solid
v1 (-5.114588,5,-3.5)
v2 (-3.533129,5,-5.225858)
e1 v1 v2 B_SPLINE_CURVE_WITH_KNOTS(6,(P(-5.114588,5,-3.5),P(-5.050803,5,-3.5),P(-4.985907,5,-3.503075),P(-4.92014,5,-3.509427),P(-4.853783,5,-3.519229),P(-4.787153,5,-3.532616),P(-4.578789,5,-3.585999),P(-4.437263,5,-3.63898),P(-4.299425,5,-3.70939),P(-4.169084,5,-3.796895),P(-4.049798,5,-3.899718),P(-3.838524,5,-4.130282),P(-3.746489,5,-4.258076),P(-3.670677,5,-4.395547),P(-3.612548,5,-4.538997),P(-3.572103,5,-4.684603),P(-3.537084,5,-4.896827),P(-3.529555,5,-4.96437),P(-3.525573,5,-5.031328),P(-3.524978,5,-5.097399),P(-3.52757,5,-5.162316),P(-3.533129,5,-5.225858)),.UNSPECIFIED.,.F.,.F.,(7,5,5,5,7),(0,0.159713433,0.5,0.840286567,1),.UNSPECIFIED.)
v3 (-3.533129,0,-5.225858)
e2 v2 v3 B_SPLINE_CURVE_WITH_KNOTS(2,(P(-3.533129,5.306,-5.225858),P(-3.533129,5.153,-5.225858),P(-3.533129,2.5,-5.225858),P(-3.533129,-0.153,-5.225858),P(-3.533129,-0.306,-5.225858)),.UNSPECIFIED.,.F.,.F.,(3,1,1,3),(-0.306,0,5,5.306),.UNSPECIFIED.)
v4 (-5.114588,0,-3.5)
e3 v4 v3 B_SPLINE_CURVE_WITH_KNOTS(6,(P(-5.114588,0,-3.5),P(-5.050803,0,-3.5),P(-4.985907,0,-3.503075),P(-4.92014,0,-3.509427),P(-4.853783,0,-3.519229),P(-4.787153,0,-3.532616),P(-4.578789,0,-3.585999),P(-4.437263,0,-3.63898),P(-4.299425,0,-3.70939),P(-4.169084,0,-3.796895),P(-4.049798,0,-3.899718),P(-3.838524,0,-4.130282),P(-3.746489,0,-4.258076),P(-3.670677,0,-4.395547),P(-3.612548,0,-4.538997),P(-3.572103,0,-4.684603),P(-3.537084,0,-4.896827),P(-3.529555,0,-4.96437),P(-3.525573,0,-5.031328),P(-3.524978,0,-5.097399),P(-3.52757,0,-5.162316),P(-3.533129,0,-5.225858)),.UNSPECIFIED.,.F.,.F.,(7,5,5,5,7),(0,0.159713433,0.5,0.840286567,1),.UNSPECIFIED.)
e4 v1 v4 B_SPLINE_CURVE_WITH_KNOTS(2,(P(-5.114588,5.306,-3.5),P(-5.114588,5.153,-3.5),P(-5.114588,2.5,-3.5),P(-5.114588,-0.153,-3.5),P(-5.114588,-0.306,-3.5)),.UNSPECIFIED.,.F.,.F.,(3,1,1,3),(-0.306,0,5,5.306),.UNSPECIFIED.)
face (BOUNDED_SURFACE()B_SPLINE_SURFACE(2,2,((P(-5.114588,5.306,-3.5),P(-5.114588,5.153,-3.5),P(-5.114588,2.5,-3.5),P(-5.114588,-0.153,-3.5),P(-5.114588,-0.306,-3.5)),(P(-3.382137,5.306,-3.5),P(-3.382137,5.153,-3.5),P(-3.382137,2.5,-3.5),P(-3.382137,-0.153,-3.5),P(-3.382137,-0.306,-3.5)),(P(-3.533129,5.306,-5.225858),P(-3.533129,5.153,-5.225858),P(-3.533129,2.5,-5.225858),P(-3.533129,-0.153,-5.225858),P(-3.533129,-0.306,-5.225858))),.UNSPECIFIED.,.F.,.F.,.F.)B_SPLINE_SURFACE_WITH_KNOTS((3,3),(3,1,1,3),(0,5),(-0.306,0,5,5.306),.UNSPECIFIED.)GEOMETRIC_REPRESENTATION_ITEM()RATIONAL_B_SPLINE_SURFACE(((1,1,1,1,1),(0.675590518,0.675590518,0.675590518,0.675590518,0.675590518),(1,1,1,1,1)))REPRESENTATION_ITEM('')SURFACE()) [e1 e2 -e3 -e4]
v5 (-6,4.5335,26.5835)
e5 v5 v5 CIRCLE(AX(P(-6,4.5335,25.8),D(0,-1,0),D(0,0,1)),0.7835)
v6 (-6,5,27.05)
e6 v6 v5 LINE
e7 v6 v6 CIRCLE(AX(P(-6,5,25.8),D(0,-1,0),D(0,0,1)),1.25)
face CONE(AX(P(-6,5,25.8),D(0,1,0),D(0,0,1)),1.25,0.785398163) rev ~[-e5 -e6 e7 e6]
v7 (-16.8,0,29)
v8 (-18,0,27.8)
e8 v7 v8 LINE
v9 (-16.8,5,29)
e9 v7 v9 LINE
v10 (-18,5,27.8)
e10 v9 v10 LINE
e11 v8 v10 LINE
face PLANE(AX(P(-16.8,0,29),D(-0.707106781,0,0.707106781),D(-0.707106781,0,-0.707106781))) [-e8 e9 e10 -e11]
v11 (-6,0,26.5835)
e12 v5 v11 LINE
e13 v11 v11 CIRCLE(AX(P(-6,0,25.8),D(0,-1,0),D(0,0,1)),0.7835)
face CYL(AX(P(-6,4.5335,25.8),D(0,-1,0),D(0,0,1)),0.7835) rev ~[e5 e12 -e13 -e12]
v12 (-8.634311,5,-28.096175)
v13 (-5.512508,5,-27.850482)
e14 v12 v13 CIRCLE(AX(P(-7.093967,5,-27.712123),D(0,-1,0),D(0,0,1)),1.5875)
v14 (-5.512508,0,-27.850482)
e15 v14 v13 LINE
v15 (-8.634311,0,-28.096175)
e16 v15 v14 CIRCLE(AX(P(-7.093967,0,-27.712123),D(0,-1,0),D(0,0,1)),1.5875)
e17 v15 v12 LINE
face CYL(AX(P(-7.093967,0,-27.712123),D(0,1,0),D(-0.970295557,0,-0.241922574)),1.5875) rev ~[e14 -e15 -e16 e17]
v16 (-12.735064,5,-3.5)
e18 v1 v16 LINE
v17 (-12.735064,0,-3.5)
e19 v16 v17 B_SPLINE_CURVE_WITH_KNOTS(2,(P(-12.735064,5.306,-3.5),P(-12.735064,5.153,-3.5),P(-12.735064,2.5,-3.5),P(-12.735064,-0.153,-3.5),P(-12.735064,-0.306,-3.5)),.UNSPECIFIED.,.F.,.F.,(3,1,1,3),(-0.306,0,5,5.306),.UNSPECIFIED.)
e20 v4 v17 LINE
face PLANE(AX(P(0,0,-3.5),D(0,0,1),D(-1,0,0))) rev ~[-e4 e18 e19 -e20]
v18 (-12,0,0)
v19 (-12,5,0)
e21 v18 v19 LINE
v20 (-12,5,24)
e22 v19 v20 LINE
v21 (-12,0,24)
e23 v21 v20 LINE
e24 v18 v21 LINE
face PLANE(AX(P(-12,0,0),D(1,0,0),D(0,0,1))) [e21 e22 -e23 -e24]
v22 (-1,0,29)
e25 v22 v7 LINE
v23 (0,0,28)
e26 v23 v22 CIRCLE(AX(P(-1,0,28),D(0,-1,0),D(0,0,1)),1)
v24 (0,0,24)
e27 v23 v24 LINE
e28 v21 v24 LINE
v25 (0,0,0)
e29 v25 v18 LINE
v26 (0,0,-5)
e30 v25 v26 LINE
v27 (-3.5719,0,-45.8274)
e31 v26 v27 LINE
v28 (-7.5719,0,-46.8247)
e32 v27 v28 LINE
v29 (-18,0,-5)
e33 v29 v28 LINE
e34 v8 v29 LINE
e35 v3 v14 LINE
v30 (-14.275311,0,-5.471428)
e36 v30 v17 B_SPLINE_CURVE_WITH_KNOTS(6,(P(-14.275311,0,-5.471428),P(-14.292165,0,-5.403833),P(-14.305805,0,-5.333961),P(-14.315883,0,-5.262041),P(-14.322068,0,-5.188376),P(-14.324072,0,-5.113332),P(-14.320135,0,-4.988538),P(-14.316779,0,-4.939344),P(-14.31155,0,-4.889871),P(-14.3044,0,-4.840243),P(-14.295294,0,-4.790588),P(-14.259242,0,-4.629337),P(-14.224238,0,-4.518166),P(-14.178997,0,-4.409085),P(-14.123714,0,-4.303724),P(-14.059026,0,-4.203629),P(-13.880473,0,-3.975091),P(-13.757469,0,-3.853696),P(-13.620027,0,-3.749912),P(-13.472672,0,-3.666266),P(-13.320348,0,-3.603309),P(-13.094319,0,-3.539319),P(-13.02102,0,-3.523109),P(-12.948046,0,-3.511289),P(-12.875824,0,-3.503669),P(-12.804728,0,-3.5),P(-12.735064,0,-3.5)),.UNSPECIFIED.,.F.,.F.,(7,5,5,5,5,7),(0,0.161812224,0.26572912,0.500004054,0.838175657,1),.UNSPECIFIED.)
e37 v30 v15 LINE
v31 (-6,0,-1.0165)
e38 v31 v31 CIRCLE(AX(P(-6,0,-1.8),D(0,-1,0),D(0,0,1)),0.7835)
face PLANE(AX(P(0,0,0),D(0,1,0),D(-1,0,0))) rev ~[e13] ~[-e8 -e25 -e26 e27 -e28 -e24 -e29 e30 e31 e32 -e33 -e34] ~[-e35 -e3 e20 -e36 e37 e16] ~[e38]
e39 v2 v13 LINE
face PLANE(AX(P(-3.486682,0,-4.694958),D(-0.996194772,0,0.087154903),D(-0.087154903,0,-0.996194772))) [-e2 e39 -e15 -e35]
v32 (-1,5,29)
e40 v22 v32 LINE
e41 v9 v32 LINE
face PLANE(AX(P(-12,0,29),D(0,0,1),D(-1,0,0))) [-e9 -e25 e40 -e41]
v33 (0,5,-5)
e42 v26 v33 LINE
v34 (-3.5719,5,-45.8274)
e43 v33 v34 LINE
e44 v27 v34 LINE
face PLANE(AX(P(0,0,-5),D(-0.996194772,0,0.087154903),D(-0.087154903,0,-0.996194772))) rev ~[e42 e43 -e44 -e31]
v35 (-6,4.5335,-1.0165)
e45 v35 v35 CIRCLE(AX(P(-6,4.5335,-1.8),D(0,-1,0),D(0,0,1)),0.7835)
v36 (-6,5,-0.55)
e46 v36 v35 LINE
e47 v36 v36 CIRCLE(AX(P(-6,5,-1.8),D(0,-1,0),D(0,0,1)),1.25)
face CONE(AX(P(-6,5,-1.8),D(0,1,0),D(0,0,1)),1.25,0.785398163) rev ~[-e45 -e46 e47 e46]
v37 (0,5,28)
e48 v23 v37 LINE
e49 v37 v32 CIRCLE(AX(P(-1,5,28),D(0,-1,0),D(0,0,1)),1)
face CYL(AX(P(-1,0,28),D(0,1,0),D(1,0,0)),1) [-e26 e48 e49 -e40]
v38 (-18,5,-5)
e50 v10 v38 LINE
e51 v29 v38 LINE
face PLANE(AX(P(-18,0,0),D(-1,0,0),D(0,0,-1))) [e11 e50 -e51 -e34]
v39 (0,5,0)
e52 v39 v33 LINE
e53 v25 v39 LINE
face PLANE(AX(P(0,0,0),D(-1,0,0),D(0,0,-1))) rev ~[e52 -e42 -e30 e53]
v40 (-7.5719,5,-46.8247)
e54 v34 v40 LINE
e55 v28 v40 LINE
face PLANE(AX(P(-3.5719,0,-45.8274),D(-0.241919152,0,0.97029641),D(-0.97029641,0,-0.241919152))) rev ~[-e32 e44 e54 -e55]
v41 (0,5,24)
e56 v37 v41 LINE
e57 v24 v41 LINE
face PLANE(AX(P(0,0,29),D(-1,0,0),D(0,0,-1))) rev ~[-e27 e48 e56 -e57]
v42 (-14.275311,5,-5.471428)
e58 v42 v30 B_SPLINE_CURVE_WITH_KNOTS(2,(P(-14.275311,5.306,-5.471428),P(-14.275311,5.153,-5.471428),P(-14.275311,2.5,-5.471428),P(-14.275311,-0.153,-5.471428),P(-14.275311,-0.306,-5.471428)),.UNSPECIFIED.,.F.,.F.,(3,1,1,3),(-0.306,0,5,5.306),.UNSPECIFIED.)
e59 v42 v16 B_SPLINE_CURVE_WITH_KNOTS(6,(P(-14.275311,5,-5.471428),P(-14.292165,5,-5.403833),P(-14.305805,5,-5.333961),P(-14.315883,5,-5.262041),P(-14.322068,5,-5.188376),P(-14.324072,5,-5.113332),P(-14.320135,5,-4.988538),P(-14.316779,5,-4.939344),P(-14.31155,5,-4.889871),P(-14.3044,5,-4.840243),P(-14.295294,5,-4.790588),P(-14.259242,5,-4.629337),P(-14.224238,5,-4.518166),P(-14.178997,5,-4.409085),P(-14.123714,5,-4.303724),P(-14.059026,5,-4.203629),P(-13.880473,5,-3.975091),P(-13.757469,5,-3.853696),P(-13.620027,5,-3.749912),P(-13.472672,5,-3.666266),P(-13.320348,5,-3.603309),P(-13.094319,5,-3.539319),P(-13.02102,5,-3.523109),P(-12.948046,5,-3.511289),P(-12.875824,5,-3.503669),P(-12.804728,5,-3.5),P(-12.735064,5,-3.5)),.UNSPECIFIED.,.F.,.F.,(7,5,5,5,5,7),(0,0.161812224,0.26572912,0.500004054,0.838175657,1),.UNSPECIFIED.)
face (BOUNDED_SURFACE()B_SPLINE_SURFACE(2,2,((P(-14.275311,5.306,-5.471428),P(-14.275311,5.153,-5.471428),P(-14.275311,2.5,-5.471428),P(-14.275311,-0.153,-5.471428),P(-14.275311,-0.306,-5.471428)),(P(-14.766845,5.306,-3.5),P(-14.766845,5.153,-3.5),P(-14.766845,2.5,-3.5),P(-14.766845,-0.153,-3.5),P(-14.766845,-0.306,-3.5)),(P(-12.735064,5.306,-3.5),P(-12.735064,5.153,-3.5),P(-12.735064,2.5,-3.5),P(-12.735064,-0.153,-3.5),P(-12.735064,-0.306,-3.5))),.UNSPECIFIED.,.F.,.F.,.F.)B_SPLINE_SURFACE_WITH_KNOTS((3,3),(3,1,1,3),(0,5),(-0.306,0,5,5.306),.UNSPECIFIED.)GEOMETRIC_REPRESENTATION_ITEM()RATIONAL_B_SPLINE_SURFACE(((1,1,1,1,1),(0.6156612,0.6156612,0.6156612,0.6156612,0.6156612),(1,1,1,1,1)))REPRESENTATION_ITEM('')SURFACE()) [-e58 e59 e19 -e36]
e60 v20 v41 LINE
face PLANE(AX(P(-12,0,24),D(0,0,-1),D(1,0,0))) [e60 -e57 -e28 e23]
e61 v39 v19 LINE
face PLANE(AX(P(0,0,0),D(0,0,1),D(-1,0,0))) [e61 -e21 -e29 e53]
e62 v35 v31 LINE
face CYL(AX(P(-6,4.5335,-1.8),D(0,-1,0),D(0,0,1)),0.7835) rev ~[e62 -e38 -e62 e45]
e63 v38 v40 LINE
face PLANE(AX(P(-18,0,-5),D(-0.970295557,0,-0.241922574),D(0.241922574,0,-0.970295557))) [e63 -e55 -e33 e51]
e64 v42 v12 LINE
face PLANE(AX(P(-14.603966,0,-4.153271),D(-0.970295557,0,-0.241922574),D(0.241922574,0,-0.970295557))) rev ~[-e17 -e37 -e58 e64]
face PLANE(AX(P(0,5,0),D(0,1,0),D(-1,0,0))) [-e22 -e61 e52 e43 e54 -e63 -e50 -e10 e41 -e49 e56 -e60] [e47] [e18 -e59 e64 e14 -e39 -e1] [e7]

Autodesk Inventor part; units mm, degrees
ref_plane "YZ Plane" through (0, 0, 0) normal (1, 0, 0) x (0, 1, 0)
ref_plane "XZ Plane" through (0, 0, 0) normal (0, 1, 0) x (-1, 0, 0)
ref_plane "XY Plane" through (0, 0, 0) normal (0, 0, 1) x (1, 0, 0)
sketch "Sketch1" plane through (0, 0, 0) normal (0, 1, 0) x (-1, 0, 0)
  line L0 (0, 0) -> (18, 0)
  line L1 (0, 0) -> (0, -5)
  line L2 (0, -5) -> (3.5719, -45.8274)
  line L3 (18, 0) -> (18, -5)
  line L4 (18, -5) -> (7.5719, -46.8247)
  line L5 (3.5719, -45.8274) -> (7.5719, -46.8247)
  dimension "d0" = 18
  dimension "d1" = 5
  dimension "d3" = 175
  dimension "d6" = 76
  dimension "d7" = 4
extrude "Extrusion1" add sketch "Sketch1" along normal blind 5
shell "Shell1" thickness 3.5 removed faces 2 at (-7.1906, 5, -18.6091) at (-7.1906, 0, -18.6091)
fillet "Fillet1" radius 1.5875 5 edges at (-3.5, 2.5, -4.8472) (-6.3393, 2.5, -37.3009) (-3.5, 2.5, -3.5) (-14.5, 2.5, -3.5) (-14.5, 2.5, -4.5703)
sketch "Sketch2" plane through (0, 0, 0) normal (0, -1, 0) x (1, 0, 0)
  line L0 (0, 0) -> (-12, 0)
  line L1 (-12, 0) -> (-12, 24)
  line L2 (-12, 24) -> (0, 24)
  line L3 (0, 24) -> (0, 0)
  line L4 (0, 24) -> (-12, 24)
  line L5 (-12, 24) -> (-12, 29)
  line L6 (-12, 29) -> (0, 29)
  line L7 (0, 29) -> (0, 24)
  line L8 (-12, 0) -> (-18, 0)
  line L9 (-18, 0) -> (-18, 24)
  line L10 (-18, 24) -> (-12, 24)
  line L11 (-12, 24) -> (-12, 0)
  line L12 (-18, 24) -> (-13.7574, 24) construction
  line L13 (-12, 29) -> (-16.8, 29)
  line L14 (-16.8, 29) -> (-18, 27.8)
  line L15 (-18, 27.8) -> (-18, 24)
  dimension "d14" = 24
  dimension "d15" = 5
  dimension "d16" = 12
  dimension "d18" = 6
  dimension "d57" = 1.2
  dimension "d58" = 135
extrude "Extrusion2" add sketch "Sketch2" against normal blind 5 contours L8 L9 L10 L1 | L2 L5 L6 L7 | L10 L15 L14 L13 L5
fillet "Fillet3" radius 1 1 edges at (0, 2.5, 29)
sketch "Sketch4" plane through (0, 5, 0) normal (0, 1, 0) x (1, 0, 0)
  line L0 (-12, -24) -> (-12, 0) projected
  line L1 (-12, -12) -> (-18, -12)
  line L2 (-18, 5) -> (-18, -29) projected
  line L3 (0, -24) -> (-12, -24) projected
  line L4 (-12, 0) -> (0, 0) projected
  circle A0 centre (-6, -25.8) radius 0.8
  circle A1 centre (-6, 1.8) radius 0.8
  line L5 (0, -28) -> (0, -24) projected
  point P0 (-18, 1.9304)
  point P1 (-18, -27.8)
  point P2 (-16.8, -29)
  dimension "d31" = 1.6
  dimension "d32" = 27.6
  dimension "d43" = 6
  dimension "d46" = 13.8
hole "Hole1" at (-6, 5, 25.8) at (-6, 5, -1.8) direction (0, -1, 0) diameter 1.567 depth 10 countersink diameter 2.5 countersink angle 90 thread size "M2x0.4" class "6H" standard "ISO Metric profile"
sketch "Sketch17" plane through (0, 5, 0) normal (0, 1, 0) x (1, 0, 0)
  line L0 (-15.0964, 25.5) -> (0.714, 25.5)
  line L1 (-12, 0) -> (0, 0) projected
  line L2 (-5.1146, 3.5) -> (-12.7349, 3.5) projected
  line L3 (0.714, 25.5) -> (-0.9097, 44.0597)
  line L4 (-15.0964, 25.5) -> (-10.3033, 44.7241)
  line L5 (0, 5) -> (-3.5719, 45.8274) projected
  line L6 (-7.5719, 46.8247) -> (-18, 5) projected
  line L7 (-4.6811, 48.4754) -> (-4.2422, 48.3659)
  line L8 (-3.5719, 45.8274) -> (-7.5719, 46.8247) projected
  arc A0 (-0.9097, 44.0597) -> (-4.6811, 48.4754) centre (-5.8907, 43.6239) ccw
  arc A1 (-4.2422, 48.3659) -> (-10.3033, 44.7241) centre (-5.4518, 43.5145) ccw
  point P0 (-8.9248, 3.5)
  point P1 (-4.4629, 48.4157)
  dimension "d152" = 22
  dimension "d153" = 2.498
  dimension "d154" = 2.142
  dimension "d155" = 2.301
  dimension "d156" = 5
extrude "Extrusion13" [suppressed]
sketch "Sketch18" plane through (-15.4653, 7.5, -25.5) normal (0, 0, 1) x (1, 0, 0)
  line L0 (16.1813, -10) -> (16.1813, 0) construction
  line L1 (4.8628, 0) -> (0, 0) construction
  line L2 (16.1813, -10) -> (0, 0) construction
  line L3 (0, -10) -> (0, 0) construction
  line L4 (16.1813, 0) -> (0, -10) construction
  line L5 (23.0907, 2.5) -> (-6.9093, 2.5)
  line L6 (-6.9093, 2.5) -> (-6.9093, -12.5)
  line L7 (-6.9093, -12.5) -> (23.0907, -12.5)
  line L8 (23.0907, -12.5) -> (23.0907, 2.5)
  line L9 (23.0907, 2.5) -> (-6.9093, -12.5) construction
  line L10 (-6.9093, 2.5) -> (23.0907, -12.5) construction
  point P0 (15.4653, -7.5)
  point P1 (8.0907, -5)
  dimension "d161" = 25
  dimension "d162" = 15
extrude "Extrusion14" [suppressed]
combine "Combine8" [suppressed]
extrude "Extrusion15" [suppressed]
combine "Combine9" [suppressed]
combine "Combine10" [suppressed]
sketch "Sketch20" plane through (-15.4653, 7.5, -21.5) normal (0, 0, 1) x (1, 0, 0)
  line L0 (10.1584, -7.5) -> (13.6718, -7.5) projected
  line L1 (6.1837, -2.5) -> (2.5765, -2.5) projected
  line L2 (11.871, -7.5) -> (3.871, -7.5)
  line L3 (3.871, -7.5) -> (3.871, -2.5)
  line L4 (3.871, -2.5) -> (11.871, -2.5)
  line L5 (11.871, -2.5) -> (11.871, -7.5)
  circle A0 centre (19.0907, -8.5) radius 1
  line L6 (23.0907, -12.5) -> (-6.9093, -12.5) construction
  circle A1 centre (-2.9093, -1.5) radius 1
  line L7 (23.0907, -12.5) -> (23.0907, 2.5) construction
  line L8 (23.0907, 2.5) -> (-6.9093, 2.5) construction
  line L9 (11.871, -7.5) -> (3.871, -7.5)
  line L10 (3.871, -7.5) -> (3.871, -10)
  line L11 (3.871, -10) -> (11.871, -10)
  line L12 (11.871, -10) -> (11.871, -7.5)
  line L13 (11.871, -2.5) -> (3.871, -2.5)
  line L14 (3.871, -2.5) -> (3.871, 0)
  line L15 (3.871, 0) -> (11.871, 0)
  line L16 (11.871, 0) -> (11.871, -2.5)
  line L17 (-6.9093, 2.5) -> (-6.9093, -12.5) projected
  point P0 (15.4653, -7.5)
  point P1 (23.0907, -5)
  point P2 (23.0907, -5)
  dimension "d167" = 9.224
  dimension "d168" = 3.5943
  dimension "d171" = 2
  dimension "d173" = 7.5
  dimension "d175" = 4.22
  dimension "d181" = 2.5
  dimension "d185" = 8
  dimension "d186" = 2.5
  dimension "d202" = 15
  dimension "d203" = 11
  dimension "d204" = 3.561
  dimension "d205" = 2
extrude "Extrusion16" [suppressed]
extrude "Extrusion17" [suppressed]
chamfer "Chamfer2" [suppressed]
chamfer "Chamfer3" [suppressed]
chamfer "Chamfer4" [suppressed]
chamfer "Chamfer5" [suppressed]
sketch "Sketch21" plane through (-15.4653, 7.5, -25.5) normal (0, 0, 1) x (1, 0, 0)
  line L0 (23.0907, 2.5) -> (-6.9093, 2.5) projected
  line L1 (-6.9093, 2.5) -> (-6.9093, -10.5) projected
  line L2 (23.0907, 2.5) -> (-6.9093, 2.5)
  line L3 (-6.9093, 2.5) -> (-6.9093, -5)
  line L4 (-6.9093, -5) -> (23.0907, -5)
  line L5 (23.0907, -5) -> (23.0907, 2.5)
  point P0 (15.4653, -7.5)
  dimension "d194" = 7.5
extrude "Extrusion18" [suppressed]
extrude "Extrusion19" [suppressed]
combine "Combine11" [suppressed]
sketch "Sketch22" plane through (-15.4653, 7.5, -25.5) normal (0, 0, 1) x (1, 0, 0)
  circle A0 centre (-2.9093, -1.5) radius 1 construction
  line L0 (-2.9093, -2.5) -> (-2.9093, -1.5) construction
  circle A1 centre (-2.9093, -1.5) radius 1
  point P0 (15.4653, -7.5)
extrude "Extrusion20" [suppressed]
chamfer "Chamfer7" [suppressed]
sketch "Sketch23" plane through (7.6254, 10, -60.5) normal (0, 0, -1) x (-1, 0, 0)
  line L0 (30, -7.5) -> (3.5, -7.5) projected
  line L1 (30, -7.5) -> (30, -11)
  line L2 (26.5, -7.5) -> (30, -11) projected
  line L3 (30, -11) -> (26.5, -7.5)
  line L4 (26.5, -7.5) -> (30, -7.5)
  line L5 (0, -4) -> (3.5, -7.5) projected
  line L6 (3.5, -7.5) -> (0, -7.5)
  line L7 (0, -7.5) -> (0, -4)
  line L8 (0, -4) -> (3.5, -7.5)
  point P0 (7.6254, -10)
extrude "Extrusion21" [suppressed]
extrude "Extrusion22" [suppressed]
combine "Combine12" [suppressed]
combine "Combine13" [suppressed]
fillet "Fillet6" [suppressed]
sketch "Sketch24" plane through (-22.3746, 10, -25.5) normal (0, 1, 0) x (1, 0, 0)
  circle A0 centre (24, 29) radius 1
  line L0 (30, 35) -> (0, 35) projected
  line L1 (30, 0) -> (30, 35) projected
  circle A1 centre (24, 11) radius 1
  circle A2 centre (6, 29) radius 1
  circle A3 centre (6, 11) radius 1
  point P0 (22.3746, -25.5)
  dimension "d216" = 2
  dimension "d217" = 4.064
  dimension "d218" = 4.147
  dimension "d221" = 18
  dimension "d224" = 20
extrude "Extrusion23" [suppressed]
extrude "Extrusion24" [suppressed]
chamfer "Chamfer8" [suppressed]
chamfer "Chamfer9" [suppressed]
properties part number "rapoukLegv9_3DPrint"
